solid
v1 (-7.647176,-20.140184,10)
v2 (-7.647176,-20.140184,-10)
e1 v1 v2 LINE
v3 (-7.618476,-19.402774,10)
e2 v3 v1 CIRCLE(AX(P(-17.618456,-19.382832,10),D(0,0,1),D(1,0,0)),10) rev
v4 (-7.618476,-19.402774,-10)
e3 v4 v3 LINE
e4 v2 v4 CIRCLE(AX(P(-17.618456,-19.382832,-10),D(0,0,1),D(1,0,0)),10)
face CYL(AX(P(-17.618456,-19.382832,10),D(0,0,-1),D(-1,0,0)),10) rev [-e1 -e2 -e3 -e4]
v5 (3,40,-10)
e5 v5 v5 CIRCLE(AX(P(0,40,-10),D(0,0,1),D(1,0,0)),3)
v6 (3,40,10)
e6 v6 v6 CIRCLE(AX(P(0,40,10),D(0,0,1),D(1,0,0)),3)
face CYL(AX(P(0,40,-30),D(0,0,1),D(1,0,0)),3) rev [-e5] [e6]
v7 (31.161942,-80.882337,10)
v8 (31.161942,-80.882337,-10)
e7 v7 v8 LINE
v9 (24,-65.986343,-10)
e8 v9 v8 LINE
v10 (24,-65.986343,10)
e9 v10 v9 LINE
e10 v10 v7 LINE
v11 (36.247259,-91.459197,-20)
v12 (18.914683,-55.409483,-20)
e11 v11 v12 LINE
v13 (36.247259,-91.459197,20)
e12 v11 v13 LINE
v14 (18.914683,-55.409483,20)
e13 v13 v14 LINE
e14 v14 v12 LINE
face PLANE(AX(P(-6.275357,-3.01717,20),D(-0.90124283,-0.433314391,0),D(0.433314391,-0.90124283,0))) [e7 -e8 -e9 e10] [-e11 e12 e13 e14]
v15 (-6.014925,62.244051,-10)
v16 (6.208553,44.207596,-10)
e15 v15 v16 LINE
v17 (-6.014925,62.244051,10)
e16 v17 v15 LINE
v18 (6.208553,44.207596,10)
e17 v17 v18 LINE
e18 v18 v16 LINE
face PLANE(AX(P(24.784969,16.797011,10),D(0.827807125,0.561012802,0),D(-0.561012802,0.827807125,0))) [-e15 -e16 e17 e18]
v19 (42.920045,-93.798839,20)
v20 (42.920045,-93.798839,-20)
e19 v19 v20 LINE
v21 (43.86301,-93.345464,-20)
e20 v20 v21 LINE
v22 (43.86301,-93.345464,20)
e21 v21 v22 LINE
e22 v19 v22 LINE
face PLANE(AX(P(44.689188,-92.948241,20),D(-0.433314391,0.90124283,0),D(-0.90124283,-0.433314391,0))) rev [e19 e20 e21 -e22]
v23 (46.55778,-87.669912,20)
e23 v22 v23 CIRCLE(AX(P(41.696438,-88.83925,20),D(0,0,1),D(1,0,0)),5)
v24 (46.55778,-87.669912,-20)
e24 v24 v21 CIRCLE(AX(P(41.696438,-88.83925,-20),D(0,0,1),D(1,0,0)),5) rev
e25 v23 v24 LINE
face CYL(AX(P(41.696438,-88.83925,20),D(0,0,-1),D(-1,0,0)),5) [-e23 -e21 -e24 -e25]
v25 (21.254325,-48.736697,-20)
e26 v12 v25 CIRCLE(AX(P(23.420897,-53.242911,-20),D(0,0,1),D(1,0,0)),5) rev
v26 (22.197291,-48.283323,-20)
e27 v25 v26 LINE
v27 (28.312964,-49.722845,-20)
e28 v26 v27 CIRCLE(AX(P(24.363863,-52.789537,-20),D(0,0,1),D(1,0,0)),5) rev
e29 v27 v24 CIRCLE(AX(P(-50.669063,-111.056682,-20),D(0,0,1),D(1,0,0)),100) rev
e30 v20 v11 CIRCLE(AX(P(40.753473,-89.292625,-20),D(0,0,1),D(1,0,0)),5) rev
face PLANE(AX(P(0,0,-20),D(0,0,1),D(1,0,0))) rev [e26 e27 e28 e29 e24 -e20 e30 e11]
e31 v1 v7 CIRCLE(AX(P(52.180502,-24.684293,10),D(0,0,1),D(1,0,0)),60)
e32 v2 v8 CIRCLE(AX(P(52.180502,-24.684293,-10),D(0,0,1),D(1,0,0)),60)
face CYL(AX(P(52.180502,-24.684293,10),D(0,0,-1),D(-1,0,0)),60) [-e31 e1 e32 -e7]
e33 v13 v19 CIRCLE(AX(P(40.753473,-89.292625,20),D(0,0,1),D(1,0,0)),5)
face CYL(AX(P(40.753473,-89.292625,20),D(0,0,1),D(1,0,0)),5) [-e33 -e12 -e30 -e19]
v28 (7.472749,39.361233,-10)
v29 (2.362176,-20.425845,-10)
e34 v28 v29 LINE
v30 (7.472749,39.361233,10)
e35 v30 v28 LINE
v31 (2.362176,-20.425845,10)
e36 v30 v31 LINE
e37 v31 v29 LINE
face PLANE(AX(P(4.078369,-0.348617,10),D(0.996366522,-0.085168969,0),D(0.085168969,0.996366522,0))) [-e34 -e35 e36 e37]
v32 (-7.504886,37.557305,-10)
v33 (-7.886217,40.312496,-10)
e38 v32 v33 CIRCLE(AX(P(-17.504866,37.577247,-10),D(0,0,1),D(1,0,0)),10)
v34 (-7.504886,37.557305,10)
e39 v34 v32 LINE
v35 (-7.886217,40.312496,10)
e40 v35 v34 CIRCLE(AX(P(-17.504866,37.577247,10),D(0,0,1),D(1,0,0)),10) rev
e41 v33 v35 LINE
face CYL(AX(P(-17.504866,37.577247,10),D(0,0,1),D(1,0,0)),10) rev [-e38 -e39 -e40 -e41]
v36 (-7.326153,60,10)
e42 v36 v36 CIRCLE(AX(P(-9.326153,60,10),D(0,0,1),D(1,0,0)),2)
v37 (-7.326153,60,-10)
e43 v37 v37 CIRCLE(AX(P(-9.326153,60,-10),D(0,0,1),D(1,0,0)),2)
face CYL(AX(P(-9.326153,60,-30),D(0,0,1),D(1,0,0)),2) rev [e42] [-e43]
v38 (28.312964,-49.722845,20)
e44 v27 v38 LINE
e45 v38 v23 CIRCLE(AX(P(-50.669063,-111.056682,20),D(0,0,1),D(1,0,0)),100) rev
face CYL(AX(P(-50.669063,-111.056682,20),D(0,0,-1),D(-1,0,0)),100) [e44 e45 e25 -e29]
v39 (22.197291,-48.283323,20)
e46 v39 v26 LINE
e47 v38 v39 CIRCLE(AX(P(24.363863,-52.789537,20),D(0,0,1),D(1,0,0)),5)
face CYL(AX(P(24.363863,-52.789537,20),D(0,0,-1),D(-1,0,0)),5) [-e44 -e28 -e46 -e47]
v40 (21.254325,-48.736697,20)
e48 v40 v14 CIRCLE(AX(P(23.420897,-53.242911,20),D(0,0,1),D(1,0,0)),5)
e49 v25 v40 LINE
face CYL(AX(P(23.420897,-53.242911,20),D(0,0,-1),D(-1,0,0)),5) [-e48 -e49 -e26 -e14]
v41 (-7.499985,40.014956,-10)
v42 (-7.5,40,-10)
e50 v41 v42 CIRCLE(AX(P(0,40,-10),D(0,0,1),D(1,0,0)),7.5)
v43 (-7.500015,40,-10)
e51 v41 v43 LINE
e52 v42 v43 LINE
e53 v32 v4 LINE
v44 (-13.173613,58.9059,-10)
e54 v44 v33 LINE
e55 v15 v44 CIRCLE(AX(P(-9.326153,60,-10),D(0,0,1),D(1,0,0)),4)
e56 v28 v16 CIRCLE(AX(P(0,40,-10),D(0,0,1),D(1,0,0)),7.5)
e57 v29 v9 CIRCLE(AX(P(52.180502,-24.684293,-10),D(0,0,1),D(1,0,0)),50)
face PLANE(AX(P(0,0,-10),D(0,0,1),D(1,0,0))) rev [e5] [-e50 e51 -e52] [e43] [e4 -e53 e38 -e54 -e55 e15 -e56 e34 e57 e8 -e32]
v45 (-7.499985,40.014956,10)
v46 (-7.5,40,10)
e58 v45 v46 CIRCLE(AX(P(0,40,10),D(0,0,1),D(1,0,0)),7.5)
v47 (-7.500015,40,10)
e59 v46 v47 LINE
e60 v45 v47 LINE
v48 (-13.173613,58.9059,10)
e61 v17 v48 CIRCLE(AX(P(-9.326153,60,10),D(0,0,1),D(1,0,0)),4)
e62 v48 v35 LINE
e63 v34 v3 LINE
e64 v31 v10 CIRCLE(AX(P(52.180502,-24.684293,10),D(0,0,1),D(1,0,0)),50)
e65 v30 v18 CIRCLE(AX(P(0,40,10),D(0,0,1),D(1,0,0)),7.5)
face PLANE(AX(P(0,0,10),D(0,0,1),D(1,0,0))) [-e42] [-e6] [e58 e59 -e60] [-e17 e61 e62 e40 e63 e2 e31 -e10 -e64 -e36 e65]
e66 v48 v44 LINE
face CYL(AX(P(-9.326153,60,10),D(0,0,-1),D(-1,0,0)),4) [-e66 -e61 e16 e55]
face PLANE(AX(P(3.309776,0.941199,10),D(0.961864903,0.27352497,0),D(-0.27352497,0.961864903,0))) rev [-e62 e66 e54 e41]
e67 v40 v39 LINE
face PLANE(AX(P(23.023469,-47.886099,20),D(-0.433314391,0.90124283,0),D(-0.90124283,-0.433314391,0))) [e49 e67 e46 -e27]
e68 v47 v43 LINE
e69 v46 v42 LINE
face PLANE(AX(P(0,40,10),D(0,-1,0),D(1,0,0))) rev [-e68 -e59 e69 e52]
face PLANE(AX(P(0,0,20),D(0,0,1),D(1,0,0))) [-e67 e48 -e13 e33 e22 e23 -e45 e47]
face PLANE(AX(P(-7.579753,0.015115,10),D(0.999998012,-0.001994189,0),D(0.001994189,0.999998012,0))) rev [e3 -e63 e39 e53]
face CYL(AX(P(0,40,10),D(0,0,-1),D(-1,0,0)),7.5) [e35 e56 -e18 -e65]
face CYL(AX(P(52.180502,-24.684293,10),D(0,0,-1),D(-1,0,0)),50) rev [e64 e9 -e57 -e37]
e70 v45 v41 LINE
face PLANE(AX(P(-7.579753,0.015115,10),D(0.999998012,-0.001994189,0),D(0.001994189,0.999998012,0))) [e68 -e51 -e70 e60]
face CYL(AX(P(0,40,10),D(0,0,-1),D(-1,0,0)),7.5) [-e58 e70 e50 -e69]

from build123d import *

# Parameters (mm, degrees)
BOSS_EXTRUDE3_DEPTH = 10
BOSS_EXTRUDE4_DEPTH = 20
SKETCH2_R           = 2
SKETCH2_R_2         = 3
CUT_EXTRUDE1_DEPTH  = 40
FILLET3_R           = 10
FILLET4_R           = 10
FILLET5_R           = 5
FILLET6_R           = 5
FILLET7_R           = 5
FILLET8_R           = 5


with BuildPart() as part:
    # Sketch1 → Boss-Extrude3 (new, symmetric)
    with BuildSketch(Plane.XY):
        with BuildLine():
            Line((-6.014924663, 62.244051207), (6.208553437, 44.207596014))
            ThreePointArc((6.208553437, 44.207596014), (7.257156315, 41.893061598), (7.472748917, 39.361232736))
            Line((7.472748917, 39.361232736), (2.362176037, -20.425844843))
            ThreePointArc((2.362176037, -20.425844843), (7.015315923, -46.134373754), (24, -65.986342835))
            Line((24, -65.986342835), (31.161941742, -80.882336991))
            ThreePointArc((31.161941742, -80.882336991), (1.523988114, -56.838882139), (-7.619240262, -19.78625212))
            Line((-7.619240262, -19.78625212), (-7.50208553, 38.961677125))
            Line((-7.50208553, 38.961677125), (-13.173612773, 58.905900119))
            ThreePointArc((-13.173612773, 58.905900119), (-11.01662621, 63.625231148), (-6.014924663, 62.244051207))
        make_face()
        with BuildLine():
            Line((-7.499985087, 40.014956421), (-7.500014913, 40))
            ThreePointArc((-7.500014913, 40), (-7.499996272, 40.007478214), (-7.499985087, 40.014956421))
        make_face(mode=Mode.SUBTRACT)
    extrude(amount=BOSS_EXTRUDE3_DEPTH, both=True)

    # Sketch1<4> → Boss-Extrude4 (add, symmetric)
    with BuildSketch(Plane.XY):
        with BuildLine():
            ThreePointArc((25.760539384, -46.570125255), (39.455220381, -67.725242398), (47.426258953, -91.632266743))
            Line((47.426258953, -91.632266743), (38.413830656, -95.965410657))
            Line((38.413830656, -95.965410657), (31.161941742, -80.882336991))
            Line((31.161941742, -80.882336991), (24, -65.986342835))
            Line((24, -65.986342835), (16.748111086, -50.903269169))
            Line((16.748111086, -50.903269169), (25.760539384, -46.570125255))
        make_face()
    extrude(amount=BOSS_EXTRUDE4_DEPTH, both=True)

    # Sketch2 → Cut-Extrude1 (cut)
    with BuildSketch(Plane.XY.offset(10)):
        with Locations((-9.326153163, 60)):
            Circle(SKETCH2_R)
        with Locations((0, 40)):
            Circle(SKETCH2_R_2)
    extrude(amount=-CUT_EXTRUDE1_DEPTH, mode=Mode.SUBTRACT)

    # Fillet3
    fillet3_edges = [part.edges().sort_by_distance(p)[0] for p in [
        (-7.50208553, 38.961677125, 0),
    ]]
    fillet(fillet3_edges, radius=FILLET3_R)

    # Fillet4
    # the kernel refuses this fillet: 10 mm, written as the material it adds along each edge
    with BuildSketch(Plane(origin=(-7.619240262, -19.78625212, -10), x_dir=(0.0019941894265581785, 0.9999980116022886, 0), z_dir=(0, 0, 1))) as fillet4_piece_1:
        with BuildLine():
            CenterArc((0.38347882, 10), FILLET4_R, 265.770794781, 4.229205219)
            ThreePointArc((-0.353986639, 0.027229838), (-0.176973179, 0.013876746), (0, 0))
            Line((0, 0), (0.38347882, 0))
        make_face()
    extrude(amount=20)

    # Fillet5
    fillet5_edges = [part.edges().sort_by_distance(p)[0] for p in [
        (25.760539384, -46.570125255, 0),
    ]]
    fillet(fillet5_edges, radius=FILLET5_R)

    # Fillet6
    fillet6_edges = [part.edges().sort_by_distance(p)[0] for p in [
        (47.426258953, -91.632266743, 0),
    ]]
    fillet(fillet6_edges, radius=FILLET6_R)

    # Fillet7
    fillet7_edges = [part.edges().sort_by_distance(p)[0] for p in [
        (16.748111086, -50.903269169, 0),
    ]]
    fillet(fillet7_edges, radius=FILLET7_R)

    # Fillet8
    fillet8_edges = [part.edges().sort_by_distance(p)[0] for p in [
        (38.413830656, -95.965410657, 0),
    ]]
    fillet(fillet8_edges, radius=FILLET8_R)


solid = part.part
